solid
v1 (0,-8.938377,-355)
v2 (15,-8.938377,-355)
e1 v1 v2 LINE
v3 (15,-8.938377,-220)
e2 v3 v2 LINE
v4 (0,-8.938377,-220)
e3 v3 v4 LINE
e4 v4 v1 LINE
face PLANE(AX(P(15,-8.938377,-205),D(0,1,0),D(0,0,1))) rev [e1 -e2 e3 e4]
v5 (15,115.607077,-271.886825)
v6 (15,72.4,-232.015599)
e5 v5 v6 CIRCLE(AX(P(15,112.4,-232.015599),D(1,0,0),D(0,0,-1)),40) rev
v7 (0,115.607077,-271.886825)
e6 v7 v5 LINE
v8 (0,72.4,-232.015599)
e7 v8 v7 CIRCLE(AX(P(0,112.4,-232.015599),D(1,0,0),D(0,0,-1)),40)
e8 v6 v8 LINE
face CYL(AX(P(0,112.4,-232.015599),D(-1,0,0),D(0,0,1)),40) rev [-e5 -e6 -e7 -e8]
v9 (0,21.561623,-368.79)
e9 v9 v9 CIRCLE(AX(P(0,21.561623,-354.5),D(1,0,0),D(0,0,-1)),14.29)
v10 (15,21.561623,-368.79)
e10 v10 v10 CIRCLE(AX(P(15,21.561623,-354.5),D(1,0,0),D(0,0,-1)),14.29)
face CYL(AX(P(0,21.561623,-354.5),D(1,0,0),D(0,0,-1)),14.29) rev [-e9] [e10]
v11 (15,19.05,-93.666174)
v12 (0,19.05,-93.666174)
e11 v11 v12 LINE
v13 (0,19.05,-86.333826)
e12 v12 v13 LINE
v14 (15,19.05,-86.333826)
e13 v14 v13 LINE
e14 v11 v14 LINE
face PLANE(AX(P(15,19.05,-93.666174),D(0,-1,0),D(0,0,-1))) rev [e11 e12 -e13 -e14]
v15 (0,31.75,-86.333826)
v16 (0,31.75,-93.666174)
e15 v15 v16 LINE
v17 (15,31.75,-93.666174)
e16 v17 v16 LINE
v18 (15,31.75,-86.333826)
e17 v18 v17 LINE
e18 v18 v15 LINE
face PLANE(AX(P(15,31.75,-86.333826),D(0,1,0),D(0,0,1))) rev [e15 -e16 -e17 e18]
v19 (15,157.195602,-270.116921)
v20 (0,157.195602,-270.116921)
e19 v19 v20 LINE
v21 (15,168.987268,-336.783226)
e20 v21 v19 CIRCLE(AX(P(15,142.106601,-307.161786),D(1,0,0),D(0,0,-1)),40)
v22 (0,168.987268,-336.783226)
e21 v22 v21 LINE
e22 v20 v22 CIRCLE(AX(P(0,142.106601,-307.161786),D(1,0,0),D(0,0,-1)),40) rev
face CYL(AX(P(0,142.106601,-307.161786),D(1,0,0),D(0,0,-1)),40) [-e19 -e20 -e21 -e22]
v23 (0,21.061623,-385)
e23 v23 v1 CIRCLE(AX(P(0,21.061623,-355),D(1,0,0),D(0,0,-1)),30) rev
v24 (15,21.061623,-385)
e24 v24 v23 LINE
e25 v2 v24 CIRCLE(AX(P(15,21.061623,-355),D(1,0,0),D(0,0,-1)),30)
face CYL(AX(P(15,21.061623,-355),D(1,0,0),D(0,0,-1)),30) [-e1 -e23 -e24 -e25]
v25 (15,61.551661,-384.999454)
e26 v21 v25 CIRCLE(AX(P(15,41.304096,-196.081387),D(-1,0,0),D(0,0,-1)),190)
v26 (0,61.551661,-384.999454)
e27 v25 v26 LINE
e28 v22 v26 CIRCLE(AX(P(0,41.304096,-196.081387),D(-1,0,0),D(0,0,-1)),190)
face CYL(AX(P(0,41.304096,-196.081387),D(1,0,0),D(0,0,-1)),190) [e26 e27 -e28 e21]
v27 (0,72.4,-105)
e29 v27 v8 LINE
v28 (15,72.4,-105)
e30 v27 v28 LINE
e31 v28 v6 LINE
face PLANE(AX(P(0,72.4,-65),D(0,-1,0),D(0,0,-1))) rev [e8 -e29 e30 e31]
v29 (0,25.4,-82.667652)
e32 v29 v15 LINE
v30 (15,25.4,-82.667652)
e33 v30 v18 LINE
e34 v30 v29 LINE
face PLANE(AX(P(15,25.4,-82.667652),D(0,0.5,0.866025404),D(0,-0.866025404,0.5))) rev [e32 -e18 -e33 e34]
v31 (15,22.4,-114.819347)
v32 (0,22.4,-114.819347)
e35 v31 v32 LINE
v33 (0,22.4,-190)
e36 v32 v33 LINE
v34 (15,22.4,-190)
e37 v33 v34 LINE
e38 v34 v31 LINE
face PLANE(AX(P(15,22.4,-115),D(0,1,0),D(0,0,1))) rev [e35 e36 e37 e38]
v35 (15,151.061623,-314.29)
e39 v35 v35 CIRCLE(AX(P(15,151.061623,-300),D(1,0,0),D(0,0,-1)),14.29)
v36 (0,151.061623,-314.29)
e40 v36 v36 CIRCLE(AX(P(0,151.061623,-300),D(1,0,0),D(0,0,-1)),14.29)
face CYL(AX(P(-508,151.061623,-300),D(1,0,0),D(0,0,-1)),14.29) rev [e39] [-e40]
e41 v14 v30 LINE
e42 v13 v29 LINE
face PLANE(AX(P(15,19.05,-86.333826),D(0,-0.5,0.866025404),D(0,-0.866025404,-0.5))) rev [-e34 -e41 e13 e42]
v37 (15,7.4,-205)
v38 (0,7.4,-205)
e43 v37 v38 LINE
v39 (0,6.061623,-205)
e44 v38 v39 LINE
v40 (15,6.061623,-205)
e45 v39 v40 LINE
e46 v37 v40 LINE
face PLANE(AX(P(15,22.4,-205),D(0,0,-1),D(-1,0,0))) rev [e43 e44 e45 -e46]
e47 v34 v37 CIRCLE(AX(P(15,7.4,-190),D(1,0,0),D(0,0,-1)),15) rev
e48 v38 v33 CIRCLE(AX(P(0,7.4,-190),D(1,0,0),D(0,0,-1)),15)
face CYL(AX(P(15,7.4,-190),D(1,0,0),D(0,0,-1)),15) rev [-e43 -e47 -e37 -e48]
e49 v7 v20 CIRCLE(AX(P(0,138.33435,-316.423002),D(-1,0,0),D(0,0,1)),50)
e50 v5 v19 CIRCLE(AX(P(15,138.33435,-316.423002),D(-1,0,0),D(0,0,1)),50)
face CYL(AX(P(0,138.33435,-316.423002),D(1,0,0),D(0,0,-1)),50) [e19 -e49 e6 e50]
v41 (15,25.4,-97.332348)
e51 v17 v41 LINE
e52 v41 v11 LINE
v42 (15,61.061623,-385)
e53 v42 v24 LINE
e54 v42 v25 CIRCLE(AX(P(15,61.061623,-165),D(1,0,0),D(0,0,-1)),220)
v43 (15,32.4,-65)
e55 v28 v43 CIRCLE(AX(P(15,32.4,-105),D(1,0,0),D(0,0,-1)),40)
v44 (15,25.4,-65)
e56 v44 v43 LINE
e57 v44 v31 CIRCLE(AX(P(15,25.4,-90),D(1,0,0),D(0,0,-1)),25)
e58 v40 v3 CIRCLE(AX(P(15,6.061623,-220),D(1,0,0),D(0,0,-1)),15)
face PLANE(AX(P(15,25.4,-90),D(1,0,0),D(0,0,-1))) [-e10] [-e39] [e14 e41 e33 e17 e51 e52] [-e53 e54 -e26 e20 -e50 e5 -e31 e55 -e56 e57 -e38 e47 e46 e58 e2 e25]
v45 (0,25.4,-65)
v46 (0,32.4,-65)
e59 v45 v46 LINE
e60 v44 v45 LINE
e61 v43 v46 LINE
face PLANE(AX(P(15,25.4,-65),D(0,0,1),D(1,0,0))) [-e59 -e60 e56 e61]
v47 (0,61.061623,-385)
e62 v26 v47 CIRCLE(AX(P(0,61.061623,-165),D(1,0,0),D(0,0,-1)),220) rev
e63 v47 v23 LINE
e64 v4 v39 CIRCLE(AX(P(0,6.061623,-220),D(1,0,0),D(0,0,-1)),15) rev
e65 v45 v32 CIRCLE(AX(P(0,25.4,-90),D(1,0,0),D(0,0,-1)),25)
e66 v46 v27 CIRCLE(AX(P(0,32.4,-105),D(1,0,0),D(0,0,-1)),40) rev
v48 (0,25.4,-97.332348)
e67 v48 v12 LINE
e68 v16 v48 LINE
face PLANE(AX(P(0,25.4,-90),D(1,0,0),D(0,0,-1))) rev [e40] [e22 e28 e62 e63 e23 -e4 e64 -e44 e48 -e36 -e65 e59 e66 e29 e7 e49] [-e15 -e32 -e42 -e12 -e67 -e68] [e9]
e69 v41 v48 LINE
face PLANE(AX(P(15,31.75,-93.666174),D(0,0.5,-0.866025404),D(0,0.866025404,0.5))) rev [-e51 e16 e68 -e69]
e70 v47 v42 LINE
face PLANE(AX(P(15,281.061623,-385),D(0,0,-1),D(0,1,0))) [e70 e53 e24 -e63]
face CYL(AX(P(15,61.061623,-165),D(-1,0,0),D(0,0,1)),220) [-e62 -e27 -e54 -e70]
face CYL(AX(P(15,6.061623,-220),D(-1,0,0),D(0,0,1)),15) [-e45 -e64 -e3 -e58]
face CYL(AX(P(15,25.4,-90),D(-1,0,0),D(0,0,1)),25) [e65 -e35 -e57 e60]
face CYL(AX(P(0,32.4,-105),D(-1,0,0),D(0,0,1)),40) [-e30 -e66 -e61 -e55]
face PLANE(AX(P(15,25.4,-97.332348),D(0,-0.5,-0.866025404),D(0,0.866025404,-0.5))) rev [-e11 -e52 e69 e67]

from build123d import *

# Parameters (mm, degrees)
SALIENTE_EXTRUIR1_DEPTH = 15
CORTAR_EXTRUIR1_DEPTH   = 477.91260816
REDONDEO1_R             = 220
REDONDEO2_R             = 70
REDONDEO3_R             = 15
REDONDEO4_R             = 30
CROQUIS7_R              = 14.29
CORTAR_EXTRUIR5_DEPTH   = 477.91260816
CROQUIS8_R              = 14.29
CORTAR_EXTRUIR6_DEPTH   = 523
CROQUIS9_R              = 14.289999998
CORTAR_EXTRUIR7_DEPTH   = 10
CROQUIS12_R             = 12.5
CORTAR_EXTRUIR10_DEPTH  = 10
CROQUIS13_R             = 2.02
CORTAR_EXTRUIR11_DEPTH  = 10
CORTAR_EXTRUIR12_DEPTH  = 477.91260816
REDONDEO5_R             = 40
CORTAR_EXTRUIR13_DEPTH  = 429.858749969
REDONDEO6_R             = 40


with BuildPart() as part:
    # Croquis1 → Saliente-Extruir1 (new body)
    with BuildSketch(Plane(origin=(0, 0, 0), x_dir=(0, 0, -1), z_dir=(1, 0, 0))):
        with BuildLine():
            Line((65, 25.4), (65, 281.06162282))
            Line((65, 281.06162282), (385, 281.06162282))
            Line((385, 281.06162282), (385, -8.93837718))
            Line((385, -8.93837718), (205, -8.93837718))
            Line((205, -8.93837718), (205, 22.4))
            Line((205, 22.4), (115, 22.4))
            Line((115, 22.4), (114.819347292, 22.4))
            ThreePointArc((114.819347292, 22.4), (88.497282844, 0.445204045), (65, 25.4))
        make_face()
    extrude(amount=SALIENTE_EXTRUIR1_DEPTH)

    # Croquis2 → Cortar-Extruir1 (cut, through all)
    with BuildSketch(Plane.ZY):
        Polygon((-82.667651581, 25.4), (-86.333825791, 31.75), (-93.666174209, 31.75), (-97.332348419, 25.4), (-93.666174209, 19.05), (-86.333825791, 19.05), align=None)
    extrude(amount=-CORTAR_EXTRUIR1_DEPTH, mode=Mode.SUBTRACT)

    # Redondeo1
    redondeo1_edges = [part.edges().sort_by_distance(p)[0] for p in [
        (7.5, 281.06162282, -385),
    ]]
    fillet(redondeo1_edges, radius=REDONDEO1_R)

    # Redondeo2
    redondeo2_edges = [part.edges().sort_by_distance(p)[0] for p in [
        (7.5, 281.06162282, -65),
    ]]
    fillet(redondeo2_edges, radius=REDONDEO2_R)

    # Redondeo3
    redondeo3_edges = [part.edges().sort_by_distance(p)[0] for p in [
        (7.5, -8.93837718, -205),
        (7.5, 22.4, -205),
    ]]
    fillet(redondeo3_edges, radius=REDONDEO3_R)

    # Redondeo4
    redondeo4_edges = [part.edges().sort_by_distance(p)[0] for p in [
        (7.5, -8.93837718, -385),
    ]]
    fillet(redondeo4_edges, radius=REDONDEO4_R)

    # Croquis7 → Cortar-Extruir5 (cut, through all)
    with BuildSketch(Plane(origin=(15, 0, 0), x_dir=(0, 0, -1), z_dir=(1, 0, 0))):
        with Locations((354.499999998, 21.561622823)):
            Circle(CROQUIS7_R)
    extrude(amount=-CORTAR_EXTRUIR5_DEPTH, mode=Mode.SUBTRACT)

    # Croquis8 → Cortar-Extruir6 (cut)
    with BuildSketch(Plane(origin=(15, 0, 0), x_dir=(0, 0, -1), z_dir=(1, 0, 0))):
        with Locations((299.999999998, 151.061622823)):
            Circle(CROQUIS8_R)
    extrude(amount=-CORTAR_EXTRUIR6_DEPTH, mode=Mode.SUBTRACT)

    # Croquis9 → Cortar-Extruir7 (cut)
    with BuildSketch(Plane(origin=(15, 0, 0), x_dir=(0, 0, -1), z_dir=(1, 0, 0))):
        with Locations((184.499999998, 231.061622823)):
            Circle(CROQUIS9_R)
    extrude(amount=-CORTAR_EXTRUIR7_DEPTH, mode=Mode.SUBTRACT)

    # Croquis12 → Cortar-Extruir10 (cut)
    with BuildSketch(Plane.ZY):
        with Locations((-267.424734061, 207.135375692)):
            Circle(CROQUIS12_R)
    extrude(amount=-CORTAR_EXTRUIR10_DEPTH, mode=Mode.SUBTRACT)

    # Croquis13 → Cortar-Extruir11 (cut)
    with BuildSketch(Plane.ZY):
        with Locations((-263.175315265, 232.177389187)):
            Circle(CROQUIS13_R)
        with Locations((-271.674152858, 182.093362197)):
            Circle(CROQUIS13_R)
    extrude(amount=-CORTAR_EXTRUIR11_DEPTH, mode=Mode.SUBTRACT)

    # Croquis14 → Cortar-Extruir12 (cut, through all)
    with BuildSketch(Plane(origin=(15, 0, 0), x_dir=(0, 0, -1), z_dir=(1, 0, 0))):
        with BuildLine():
            Line((65, 72.4), (270, 72.4))
            ThreePointArc((270, 72.4), (274.363902477, 93.8541681), (271.886825139, 115.607077366))
            ThreePointArc((271.886825139, 115.607077366), (293.695729554, 182.870527235), (360.959179423, 161.06162282))
            Line((360.959179423, 161.06162282), (409.037931036, 257.33581614))
            Line((409.037931036, 257.33581614), (105.335360325, 302.08857435))
            Line((105.335360325, 302.08857435), (0, 212.58305793))
            Line((0, 212.58305793), (65, 72.4))
        make_face()
    extrude(amount=-CORTAR_EXTRUIR12_DEPTH, mode=Mode.SUBTRACT)

    # Redondeo5
    # the kernel refuses this fillet: 40 mm, written as the material it adds along each edge
    with BuildSketch(Plane(origin=(15, 72.4, -270), x_dir=(0, 0.9990478553757552, -0.04362777405625806), z_dir=(-1, 0, 0))) as redondeo5_piece_1:
        with BuildLine():
            CenterArc((38.304739361, -39.69334508), REDONDEO5_R, 82.900783035, 94.598735985)
            Line((-1.657174854, -37.948234118), (0, 0))
            ThreePointArc((0, 0), (21.62412798, 3.423749812), (43.24825596, 0))
        make_face()
    extrude(amount=15)
    # the kernel refuses this fillet: 40 mm, written as the material it takes off along each edge
    with BuildSketch(Plane(origin=(115, 72.4, -65), x_dir=(0, 0, -1), z_dir=(-1, 0, 0))) as redondeo5_2_piece_1:
        with BuildLine():
            CenterArc((REDONDEO5_R, REDONDEO5_R), REDONDEO5_R, 180, 90)
            Line((0, REDONDEO5_R), (0, 0))
            Line((0, 0), (REDONDEO5_R, 0))
        make_face()
    extrude(amount=215, mode=Mode.SUBTRACT)

    # Croquis15 → Cortar-Extruir13 (cut, through all)
    with BuildSketch(Plane(origin=(15, 0, 0), x_dir=(0, 0, -1), z_dir=(1, 0, 0))):
        with BuildLine():
            Line((316.423002092, 188.334350093), (358.626196651, 190.922485321))
            Line((358.626196651, 190.922485321), (422.761195779, 101.204099428))
            Line((422.761195779, 101.204099428), (385, 21.06162282))
            ThreePointArc((385, 21.06162282), (371.881027209, 113.376882144), (316.423002092, 188.334350093))
        make_face()
    extrude(amount=-CORTAR_EXTRUIR13_DEPTH, mode=Mode.SUBTRACT)

    # Redondeo6
    # the kernel refuses this fillet: 40 mm, written as the material it takes off along each edge
    with BuildSketch(Plane(origin=(154.505258907, 188.334350093, -316.423002092), x_dir=(0, -0.5580210387586911, 0.8298268013885014), z_dir=(-1, 0, 0))) as redondeo6_piece_1:
        with BuildLine():
            CenterArc((33.481262138, -33.19307214), REDONDEO6_R, 56.080950645, 115.615192881)
            ThreePointArc((-6.099380681, -27.416159986), (-3.556977801, -13.595221761), (0, 0))
            ThreePointArc((0, 0), (27.901051781, 8.508659825), (55.802103563, 0))
        make_face()
    extrude(amount=294.010517815, mode=Mode.SUBTRACT)


solid = part.part
